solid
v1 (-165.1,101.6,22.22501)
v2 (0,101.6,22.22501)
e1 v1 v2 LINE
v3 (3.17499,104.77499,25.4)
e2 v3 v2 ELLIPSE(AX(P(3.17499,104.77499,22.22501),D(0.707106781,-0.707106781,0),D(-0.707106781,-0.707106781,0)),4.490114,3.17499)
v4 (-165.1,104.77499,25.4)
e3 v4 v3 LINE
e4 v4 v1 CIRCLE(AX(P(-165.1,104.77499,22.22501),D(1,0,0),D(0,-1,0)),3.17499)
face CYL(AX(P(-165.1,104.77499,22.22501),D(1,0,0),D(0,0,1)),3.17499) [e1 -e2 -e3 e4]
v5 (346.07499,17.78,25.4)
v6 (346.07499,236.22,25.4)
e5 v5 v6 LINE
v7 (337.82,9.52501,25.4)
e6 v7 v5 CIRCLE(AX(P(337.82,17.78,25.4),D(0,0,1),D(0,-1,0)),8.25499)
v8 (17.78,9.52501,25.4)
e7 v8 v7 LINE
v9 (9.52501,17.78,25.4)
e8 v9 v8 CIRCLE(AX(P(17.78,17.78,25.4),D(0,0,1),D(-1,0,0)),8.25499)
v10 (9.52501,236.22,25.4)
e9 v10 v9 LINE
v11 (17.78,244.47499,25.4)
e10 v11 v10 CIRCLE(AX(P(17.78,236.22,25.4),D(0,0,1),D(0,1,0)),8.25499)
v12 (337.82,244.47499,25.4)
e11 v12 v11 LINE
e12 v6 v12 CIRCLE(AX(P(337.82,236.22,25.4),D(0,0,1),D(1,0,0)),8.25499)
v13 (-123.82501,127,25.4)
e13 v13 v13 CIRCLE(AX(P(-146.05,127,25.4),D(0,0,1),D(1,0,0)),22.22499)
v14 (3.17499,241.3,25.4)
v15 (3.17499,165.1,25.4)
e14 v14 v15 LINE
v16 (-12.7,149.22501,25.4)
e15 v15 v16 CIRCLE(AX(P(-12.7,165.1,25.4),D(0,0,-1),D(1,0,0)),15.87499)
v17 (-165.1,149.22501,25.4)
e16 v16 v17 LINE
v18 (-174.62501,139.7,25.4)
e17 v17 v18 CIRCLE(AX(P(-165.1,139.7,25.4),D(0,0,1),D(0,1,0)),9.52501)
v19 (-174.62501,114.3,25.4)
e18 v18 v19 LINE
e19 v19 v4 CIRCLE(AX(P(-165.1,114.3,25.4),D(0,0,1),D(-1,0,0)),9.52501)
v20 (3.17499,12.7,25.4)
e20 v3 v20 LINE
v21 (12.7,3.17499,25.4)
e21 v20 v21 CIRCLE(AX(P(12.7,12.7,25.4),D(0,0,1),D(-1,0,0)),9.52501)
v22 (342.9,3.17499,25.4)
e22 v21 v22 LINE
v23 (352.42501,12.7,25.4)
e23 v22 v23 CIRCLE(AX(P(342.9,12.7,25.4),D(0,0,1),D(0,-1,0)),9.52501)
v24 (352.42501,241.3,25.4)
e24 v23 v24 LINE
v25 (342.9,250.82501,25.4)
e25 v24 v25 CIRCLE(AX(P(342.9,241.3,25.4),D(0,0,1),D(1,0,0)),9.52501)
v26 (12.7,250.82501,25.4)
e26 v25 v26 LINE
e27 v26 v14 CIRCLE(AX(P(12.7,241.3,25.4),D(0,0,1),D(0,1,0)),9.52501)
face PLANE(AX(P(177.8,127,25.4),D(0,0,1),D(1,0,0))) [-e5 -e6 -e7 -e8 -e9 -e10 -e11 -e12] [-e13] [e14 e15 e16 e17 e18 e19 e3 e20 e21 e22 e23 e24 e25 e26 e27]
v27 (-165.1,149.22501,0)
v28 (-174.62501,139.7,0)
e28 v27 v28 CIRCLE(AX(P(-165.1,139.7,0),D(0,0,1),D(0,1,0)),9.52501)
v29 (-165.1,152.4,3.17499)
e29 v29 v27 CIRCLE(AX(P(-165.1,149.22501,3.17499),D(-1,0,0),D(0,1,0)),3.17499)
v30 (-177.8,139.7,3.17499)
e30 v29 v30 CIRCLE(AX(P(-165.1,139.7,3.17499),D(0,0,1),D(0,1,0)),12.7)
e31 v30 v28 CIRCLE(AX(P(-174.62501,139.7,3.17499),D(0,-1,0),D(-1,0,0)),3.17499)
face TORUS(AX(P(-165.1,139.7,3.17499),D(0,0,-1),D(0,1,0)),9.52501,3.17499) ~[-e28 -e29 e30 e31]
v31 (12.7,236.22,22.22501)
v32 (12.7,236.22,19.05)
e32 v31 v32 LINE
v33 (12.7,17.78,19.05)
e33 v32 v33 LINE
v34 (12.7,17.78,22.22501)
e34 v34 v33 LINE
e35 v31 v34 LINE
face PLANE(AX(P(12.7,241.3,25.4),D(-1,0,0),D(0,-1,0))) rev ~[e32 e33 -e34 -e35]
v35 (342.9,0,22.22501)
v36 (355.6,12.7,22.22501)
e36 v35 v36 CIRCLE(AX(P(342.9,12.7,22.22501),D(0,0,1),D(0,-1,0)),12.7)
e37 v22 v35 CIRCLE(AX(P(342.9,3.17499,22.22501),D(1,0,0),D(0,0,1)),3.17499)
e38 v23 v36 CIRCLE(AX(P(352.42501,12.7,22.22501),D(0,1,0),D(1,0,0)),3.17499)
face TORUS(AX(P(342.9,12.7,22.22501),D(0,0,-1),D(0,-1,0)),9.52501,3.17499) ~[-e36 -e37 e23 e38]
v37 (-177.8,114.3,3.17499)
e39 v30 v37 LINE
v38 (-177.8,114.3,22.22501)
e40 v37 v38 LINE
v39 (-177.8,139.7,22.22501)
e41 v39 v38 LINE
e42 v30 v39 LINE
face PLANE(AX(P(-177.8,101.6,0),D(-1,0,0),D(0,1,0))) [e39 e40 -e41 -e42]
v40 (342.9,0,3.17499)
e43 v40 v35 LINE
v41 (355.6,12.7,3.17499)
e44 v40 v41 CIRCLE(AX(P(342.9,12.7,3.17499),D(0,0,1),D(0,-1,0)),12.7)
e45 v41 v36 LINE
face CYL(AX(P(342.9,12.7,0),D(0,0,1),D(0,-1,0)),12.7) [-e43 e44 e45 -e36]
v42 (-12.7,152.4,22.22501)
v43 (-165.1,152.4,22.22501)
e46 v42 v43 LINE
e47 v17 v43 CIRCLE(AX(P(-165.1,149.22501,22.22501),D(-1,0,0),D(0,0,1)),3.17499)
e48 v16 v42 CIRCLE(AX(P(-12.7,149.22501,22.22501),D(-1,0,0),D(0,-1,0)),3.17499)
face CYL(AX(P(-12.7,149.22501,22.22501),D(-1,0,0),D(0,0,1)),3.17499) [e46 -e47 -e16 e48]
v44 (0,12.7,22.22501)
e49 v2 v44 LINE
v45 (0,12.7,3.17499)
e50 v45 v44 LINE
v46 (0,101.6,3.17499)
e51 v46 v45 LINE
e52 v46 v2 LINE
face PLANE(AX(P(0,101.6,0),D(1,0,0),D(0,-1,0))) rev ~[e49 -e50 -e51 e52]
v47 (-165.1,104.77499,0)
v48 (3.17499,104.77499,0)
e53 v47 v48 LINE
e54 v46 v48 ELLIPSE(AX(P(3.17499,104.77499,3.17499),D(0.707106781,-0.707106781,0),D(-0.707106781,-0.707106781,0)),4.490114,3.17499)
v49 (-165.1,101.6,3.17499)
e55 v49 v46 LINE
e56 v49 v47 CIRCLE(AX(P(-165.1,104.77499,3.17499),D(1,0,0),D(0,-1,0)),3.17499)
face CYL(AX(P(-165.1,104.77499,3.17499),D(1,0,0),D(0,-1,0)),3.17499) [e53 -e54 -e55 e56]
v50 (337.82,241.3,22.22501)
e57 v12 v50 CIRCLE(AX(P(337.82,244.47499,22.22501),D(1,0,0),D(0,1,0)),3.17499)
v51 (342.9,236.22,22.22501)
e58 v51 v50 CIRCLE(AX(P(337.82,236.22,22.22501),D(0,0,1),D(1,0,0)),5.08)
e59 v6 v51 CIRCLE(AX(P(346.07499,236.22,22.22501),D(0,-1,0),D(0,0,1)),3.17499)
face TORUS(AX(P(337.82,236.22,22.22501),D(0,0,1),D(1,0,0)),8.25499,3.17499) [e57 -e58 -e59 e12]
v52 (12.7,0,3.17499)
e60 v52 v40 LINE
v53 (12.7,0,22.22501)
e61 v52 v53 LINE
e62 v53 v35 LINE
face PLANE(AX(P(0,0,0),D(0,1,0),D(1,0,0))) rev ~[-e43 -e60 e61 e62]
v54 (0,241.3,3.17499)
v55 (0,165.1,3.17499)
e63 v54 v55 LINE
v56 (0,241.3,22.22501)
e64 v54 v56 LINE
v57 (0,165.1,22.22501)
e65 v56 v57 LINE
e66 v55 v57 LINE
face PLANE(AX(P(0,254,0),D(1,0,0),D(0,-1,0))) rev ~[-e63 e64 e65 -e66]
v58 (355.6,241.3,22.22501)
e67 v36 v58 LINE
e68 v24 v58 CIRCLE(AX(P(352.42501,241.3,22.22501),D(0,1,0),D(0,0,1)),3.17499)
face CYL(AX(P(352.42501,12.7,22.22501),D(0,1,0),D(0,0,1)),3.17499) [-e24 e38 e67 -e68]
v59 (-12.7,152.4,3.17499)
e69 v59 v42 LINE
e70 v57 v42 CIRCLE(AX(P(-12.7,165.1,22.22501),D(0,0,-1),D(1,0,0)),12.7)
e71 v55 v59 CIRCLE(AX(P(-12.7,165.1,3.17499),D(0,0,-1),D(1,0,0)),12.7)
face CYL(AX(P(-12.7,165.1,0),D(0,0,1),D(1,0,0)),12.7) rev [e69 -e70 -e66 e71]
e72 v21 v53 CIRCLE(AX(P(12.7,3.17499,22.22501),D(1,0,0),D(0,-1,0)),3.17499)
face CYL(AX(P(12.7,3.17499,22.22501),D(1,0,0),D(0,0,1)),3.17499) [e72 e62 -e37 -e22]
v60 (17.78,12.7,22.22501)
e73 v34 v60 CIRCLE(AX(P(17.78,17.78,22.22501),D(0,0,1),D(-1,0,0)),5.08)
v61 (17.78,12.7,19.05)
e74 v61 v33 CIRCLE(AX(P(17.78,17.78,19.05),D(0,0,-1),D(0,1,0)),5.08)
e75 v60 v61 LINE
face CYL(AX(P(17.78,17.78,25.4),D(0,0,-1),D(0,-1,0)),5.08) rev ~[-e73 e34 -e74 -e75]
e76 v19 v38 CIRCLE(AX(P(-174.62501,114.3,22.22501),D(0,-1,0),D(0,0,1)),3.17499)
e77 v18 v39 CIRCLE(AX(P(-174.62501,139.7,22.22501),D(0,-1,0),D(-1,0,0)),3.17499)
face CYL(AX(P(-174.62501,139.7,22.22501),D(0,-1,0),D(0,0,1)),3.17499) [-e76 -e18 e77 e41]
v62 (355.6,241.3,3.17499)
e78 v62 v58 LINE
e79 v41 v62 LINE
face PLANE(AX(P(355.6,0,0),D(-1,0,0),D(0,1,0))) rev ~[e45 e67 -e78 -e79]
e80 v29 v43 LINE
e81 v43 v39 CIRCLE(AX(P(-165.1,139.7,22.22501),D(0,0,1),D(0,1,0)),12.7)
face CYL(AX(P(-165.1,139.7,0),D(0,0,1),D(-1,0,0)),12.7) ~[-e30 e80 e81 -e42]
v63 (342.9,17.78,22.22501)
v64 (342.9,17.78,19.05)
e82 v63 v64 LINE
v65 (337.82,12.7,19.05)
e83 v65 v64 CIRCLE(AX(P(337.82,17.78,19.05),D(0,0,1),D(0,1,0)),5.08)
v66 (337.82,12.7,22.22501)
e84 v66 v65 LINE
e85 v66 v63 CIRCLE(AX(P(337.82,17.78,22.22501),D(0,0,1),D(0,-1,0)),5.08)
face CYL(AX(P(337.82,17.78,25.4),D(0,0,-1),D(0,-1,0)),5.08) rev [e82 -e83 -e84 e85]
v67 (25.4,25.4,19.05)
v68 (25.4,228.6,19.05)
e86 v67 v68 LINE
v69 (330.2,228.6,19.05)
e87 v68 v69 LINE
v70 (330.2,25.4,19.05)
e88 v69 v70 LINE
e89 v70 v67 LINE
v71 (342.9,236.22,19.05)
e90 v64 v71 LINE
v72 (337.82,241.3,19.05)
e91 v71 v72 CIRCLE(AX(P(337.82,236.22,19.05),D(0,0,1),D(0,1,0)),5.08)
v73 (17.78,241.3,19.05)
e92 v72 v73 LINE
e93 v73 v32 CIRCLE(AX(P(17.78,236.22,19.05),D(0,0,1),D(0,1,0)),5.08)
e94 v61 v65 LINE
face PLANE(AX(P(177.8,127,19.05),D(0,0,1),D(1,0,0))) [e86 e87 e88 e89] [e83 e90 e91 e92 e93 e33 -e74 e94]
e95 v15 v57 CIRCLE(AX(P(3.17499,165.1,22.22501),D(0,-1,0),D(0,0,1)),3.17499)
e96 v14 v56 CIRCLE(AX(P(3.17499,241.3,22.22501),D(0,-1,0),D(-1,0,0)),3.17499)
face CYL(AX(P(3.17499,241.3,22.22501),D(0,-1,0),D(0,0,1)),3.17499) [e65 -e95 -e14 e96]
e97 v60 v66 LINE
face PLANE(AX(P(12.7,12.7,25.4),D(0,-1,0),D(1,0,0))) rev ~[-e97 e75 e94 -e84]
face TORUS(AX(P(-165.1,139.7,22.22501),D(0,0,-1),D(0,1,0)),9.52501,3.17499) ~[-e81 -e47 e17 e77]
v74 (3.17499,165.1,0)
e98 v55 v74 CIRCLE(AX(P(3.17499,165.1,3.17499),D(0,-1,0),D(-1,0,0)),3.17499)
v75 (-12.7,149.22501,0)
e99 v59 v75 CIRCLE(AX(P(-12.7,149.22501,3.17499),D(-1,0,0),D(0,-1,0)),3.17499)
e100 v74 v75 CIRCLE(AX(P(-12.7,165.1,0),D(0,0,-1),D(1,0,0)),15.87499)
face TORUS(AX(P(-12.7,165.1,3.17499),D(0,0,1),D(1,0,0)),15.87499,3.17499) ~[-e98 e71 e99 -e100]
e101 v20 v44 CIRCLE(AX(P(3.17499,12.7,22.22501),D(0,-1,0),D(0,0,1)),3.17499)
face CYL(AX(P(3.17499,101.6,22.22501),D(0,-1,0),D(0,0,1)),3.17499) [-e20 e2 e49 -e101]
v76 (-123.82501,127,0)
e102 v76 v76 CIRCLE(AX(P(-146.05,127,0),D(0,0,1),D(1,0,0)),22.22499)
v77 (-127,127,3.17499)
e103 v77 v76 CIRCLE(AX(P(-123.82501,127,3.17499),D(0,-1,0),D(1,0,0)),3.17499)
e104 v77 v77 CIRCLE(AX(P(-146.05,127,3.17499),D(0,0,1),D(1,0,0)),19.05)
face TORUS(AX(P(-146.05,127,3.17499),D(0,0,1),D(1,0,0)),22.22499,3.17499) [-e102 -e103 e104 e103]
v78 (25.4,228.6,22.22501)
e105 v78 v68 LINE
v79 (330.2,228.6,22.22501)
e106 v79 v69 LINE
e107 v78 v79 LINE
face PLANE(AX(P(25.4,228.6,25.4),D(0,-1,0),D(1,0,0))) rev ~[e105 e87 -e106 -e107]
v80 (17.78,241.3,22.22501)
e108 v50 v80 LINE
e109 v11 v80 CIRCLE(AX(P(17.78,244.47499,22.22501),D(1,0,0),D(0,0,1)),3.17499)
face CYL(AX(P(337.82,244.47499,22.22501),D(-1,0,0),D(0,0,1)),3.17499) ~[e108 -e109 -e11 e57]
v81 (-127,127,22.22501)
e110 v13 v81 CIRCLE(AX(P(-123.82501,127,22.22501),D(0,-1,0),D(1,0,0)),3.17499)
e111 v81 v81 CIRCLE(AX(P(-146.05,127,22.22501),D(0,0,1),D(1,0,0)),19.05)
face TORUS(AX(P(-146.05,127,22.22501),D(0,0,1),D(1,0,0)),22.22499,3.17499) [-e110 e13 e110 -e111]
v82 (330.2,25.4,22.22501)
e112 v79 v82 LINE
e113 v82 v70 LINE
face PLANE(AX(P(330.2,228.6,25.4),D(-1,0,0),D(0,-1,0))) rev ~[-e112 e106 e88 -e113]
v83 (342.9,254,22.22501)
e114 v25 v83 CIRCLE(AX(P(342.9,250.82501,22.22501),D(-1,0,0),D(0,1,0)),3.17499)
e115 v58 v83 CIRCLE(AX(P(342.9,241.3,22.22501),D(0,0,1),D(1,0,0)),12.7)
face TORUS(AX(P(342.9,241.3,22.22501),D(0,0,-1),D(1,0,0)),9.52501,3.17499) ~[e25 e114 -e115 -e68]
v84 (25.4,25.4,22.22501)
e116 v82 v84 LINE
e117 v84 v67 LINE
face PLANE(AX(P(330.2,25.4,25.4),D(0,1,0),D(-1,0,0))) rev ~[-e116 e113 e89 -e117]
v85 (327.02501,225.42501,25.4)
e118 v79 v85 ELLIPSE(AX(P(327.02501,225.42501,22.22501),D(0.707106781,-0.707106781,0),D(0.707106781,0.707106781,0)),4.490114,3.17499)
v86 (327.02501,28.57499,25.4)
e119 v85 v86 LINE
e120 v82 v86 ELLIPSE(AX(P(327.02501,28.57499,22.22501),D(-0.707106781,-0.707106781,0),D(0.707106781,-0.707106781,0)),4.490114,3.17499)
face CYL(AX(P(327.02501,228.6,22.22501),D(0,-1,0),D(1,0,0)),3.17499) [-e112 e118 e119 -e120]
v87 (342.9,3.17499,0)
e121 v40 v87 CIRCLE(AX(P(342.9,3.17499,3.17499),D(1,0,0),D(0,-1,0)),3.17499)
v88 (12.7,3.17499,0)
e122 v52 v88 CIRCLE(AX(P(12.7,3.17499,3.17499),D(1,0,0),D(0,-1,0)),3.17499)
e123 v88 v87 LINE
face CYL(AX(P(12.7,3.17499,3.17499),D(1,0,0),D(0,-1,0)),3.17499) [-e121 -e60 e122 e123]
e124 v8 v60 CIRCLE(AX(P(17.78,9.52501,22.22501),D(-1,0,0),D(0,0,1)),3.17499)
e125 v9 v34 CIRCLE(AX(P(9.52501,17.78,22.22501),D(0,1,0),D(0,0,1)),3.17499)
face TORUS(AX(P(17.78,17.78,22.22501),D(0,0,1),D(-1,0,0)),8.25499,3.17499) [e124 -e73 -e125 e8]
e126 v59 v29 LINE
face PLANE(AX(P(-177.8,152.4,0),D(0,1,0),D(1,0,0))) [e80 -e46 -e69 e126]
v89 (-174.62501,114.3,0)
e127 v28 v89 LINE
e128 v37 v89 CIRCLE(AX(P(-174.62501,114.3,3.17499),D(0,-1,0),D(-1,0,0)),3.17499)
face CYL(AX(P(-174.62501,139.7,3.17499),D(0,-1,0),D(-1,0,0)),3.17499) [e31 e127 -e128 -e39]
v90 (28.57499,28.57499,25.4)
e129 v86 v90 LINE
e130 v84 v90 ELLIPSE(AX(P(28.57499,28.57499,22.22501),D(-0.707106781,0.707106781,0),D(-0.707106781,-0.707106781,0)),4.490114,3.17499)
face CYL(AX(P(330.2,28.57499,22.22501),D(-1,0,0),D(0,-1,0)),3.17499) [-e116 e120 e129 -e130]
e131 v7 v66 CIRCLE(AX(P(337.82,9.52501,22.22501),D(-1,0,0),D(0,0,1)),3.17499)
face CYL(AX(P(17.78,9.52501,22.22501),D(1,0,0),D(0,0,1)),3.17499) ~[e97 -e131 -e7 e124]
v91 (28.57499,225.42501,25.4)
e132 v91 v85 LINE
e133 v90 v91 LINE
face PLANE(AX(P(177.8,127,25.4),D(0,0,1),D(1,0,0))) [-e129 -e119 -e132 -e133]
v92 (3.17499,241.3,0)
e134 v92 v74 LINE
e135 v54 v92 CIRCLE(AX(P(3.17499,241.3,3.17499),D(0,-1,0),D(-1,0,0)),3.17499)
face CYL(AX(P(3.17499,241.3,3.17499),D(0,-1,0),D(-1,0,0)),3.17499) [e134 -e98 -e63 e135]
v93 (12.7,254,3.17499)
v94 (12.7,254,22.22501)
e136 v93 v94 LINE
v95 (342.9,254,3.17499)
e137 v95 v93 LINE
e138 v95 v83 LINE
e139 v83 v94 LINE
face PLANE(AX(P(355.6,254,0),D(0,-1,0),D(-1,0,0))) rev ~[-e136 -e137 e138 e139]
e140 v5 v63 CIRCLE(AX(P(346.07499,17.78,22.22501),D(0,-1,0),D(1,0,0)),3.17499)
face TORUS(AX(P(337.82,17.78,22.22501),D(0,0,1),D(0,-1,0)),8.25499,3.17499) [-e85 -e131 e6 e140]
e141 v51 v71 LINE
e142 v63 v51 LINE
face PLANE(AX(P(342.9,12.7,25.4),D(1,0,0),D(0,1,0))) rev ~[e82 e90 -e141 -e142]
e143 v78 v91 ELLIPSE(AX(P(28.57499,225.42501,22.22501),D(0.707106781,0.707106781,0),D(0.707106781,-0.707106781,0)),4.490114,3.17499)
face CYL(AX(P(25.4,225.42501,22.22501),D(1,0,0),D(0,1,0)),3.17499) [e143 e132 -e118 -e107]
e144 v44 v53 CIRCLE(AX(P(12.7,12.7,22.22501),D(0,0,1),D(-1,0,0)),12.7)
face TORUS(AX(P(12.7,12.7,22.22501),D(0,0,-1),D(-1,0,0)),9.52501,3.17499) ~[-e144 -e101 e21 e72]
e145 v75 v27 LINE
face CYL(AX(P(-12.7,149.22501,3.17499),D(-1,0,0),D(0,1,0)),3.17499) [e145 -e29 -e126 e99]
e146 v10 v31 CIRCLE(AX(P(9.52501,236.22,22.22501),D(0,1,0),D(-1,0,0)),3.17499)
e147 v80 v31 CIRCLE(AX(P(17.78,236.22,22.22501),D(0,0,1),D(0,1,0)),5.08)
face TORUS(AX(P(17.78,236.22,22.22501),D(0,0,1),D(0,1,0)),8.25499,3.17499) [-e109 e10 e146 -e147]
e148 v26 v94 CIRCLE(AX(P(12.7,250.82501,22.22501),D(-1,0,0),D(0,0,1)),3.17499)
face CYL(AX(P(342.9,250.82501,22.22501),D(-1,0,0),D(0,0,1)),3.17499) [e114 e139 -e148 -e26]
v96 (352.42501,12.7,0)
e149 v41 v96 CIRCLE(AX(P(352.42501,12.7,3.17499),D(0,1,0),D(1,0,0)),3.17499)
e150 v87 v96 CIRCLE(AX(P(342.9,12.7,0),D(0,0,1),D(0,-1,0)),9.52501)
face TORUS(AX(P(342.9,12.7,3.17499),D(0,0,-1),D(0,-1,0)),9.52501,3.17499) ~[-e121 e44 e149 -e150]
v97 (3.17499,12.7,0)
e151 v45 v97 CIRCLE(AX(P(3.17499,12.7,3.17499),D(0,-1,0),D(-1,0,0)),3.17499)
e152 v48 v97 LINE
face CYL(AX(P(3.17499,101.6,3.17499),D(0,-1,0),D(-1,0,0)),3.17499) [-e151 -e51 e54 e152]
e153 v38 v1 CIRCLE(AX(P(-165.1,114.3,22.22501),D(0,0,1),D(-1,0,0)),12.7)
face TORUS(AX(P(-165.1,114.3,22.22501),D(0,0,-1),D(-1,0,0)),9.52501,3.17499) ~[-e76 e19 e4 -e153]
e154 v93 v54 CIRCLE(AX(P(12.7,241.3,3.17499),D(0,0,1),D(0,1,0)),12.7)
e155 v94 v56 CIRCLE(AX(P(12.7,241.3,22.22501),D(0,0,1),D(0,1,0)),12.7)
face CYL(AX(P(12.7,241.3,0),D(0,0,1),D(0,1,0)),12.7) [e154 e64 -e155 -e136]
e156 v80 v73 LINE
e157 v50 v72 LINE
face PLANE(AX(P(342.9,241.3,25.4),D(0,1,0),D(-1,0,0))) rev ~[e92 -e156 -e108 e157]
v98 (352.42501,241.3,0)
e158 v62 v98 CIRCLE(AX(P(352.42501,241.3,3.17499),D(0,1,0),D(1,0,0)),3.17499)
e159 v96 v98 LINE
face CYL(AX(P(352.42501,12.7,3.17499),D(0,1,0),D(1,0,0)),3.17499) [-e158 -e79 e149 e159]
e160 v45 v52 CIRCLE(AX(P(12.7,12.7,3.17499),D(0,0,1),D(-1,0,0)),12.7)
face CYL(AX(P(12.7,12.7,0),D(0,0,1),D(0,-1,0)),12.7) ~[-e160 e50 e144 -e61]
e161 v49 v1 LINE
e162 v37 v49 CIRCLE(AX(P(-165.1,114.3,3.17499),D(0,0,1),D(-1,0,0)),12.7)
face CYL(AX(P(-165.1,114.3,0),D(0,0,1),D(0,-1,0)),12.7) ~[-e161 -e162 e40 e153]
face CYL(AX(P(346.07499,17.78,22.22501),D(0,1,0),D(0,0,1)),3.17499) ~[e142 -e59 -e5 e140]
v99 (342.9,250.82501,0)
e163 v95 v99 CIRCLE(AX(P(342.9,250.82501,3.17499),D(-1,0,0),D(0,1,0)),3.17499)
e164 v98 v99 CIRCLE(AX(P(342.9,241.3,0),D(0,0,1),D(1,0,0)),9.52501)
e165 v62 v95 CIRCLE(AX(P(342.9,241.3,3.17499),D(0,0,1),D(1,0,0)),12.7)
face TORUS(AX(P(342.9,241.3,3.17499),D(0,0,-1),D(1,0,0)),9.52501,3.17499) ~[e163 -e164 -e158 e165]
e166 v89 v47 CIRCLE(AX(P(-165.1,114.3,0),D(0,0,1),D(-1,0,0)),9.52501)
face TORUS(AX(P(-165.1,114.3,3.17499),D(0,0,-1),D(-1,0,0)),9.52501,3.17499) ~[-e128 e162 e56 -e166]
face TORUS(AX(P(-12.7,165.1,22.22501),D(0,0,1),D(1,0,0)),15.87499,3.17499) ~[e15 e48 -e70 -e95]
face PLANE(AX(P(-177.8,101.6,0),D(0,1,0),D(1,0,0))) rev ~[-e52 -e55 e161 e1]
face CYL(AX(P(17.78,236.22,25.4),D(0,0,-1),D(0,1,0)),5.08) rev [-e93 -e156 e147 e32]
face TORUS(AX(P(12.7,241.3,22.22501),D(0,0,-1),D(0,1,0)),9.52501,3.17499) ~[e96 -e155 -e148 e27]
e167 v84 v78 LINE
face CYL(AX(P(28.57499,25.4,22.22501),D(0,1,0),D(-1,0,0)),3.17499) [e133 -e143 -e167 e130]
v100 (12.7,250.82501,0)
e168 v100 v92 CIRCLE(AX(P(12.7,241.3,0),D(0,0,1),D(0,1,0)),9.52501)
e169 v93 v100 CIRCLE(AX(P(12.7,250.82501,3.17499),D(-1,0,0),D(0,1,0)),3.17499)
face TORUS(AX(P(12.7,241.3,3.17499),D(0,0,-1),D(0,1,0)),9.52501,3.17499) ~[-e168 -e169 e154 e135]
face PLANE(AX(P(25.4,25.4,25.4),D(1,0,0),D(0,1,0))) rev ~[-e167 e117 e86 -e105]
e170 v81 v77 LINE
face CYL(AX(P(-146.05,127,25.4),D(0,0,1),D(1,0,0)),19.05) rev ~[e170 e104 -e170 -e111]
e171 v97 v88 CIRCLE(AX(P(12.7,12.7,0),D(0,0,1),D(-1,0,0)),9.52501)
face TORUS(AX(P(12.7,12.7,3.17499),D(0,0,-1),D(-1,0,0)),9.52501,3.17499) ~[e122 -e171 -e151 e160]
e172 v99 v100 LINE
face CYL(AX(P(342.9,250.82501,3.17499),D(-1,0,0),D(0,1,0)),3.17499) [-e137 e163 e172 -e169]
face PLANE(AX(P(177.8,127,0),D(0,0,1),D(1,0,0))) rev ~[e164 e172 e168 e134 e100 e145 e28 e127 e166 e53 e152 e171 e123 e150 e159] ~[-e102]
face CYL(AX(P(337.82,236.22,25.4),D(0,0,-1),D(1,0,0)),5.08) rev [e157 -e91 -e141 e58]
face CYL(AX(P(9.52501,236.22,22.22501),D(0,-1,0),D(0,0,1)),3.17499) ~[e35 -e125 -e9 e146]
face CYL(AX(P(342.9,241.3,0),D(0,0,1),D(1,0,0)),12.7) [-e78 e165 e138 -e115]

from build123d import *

# Parameters (mm, degrees)
F0_W     = 177.8
F0_H     = 50.8
F1_DEPTH = 25.4
F2_R     = 19.05
F3_DEPTH = 25.4
F5_DEPTH = 6.35
F6_R     = 5.08
F7_R     = 12.7
F8_R     = 3.17499


# Not quite as in the source:
# - a fillet or chamfer is up to 0.001 mm smaller than in the source, because OpenCascade refuses the exact size


with BuildPart() as f1:
    # F0 (on Top) → F1 (new body)
    with BuildSketch(Plane.XY):
        Polygon((0, 101.6), (0, 0), (355.6, 0), (355.6, 254), (0, 254), (0, 152.4), align=None)
        with Locations((-88.9, 127)):
            Rectangle(F0_W, F0_H)
    extrude(amount=F1_DEPTH)

    # F2 (on face) → F3 (cut)
    with BuildSketch(Plane.XY.offset(25.4)):
        with Locations((-146.05, 127)):
            Circle(F2_R)
    extrude(amount=-F3_DEPTH, mode=Mode.SUBTRACT)

    # F4 (on face) → F5 (cut)
    with BuildSketch(Plane.XY.offset(25.4)):
        Polygon((12.7, 101.6), (12.7, 12.7), (342.9, 12.7), (342.9, 241.3), (12.7, 241.3), (12.7, 152.4), align=None)
        Polygon((25.4, 101.6), (25.4, 152.4), (25.4, 228.6), (330.2, 228.6), (330.2, 25.4), (25.4, 25.4), align=None, mode=Mode.SUBTRACT)
    extrude(amount=-F5_DEPTH, mode=Mode.SUBTRACT)

    # F6
    f6_edges = [f1.edges().sort_by_distance(p)[0] for p in [
        (12.7, 241.3, 22.225),
        (342.9, 241.3, 22.225),
        (12.7, 12.7, 22.225),
        (342.9, 12.7, 22.225),
    ]]
    fillet(f6_edges, radius=F6_R)

    # F7
    f7_edges = [f1.edges().sort_by_distance(p)[0] for p in [
        (355.6, 0, 12.7),
        (0, 0, 12.7),
        (-177.8, 101.6, 12.7),
        (-177.8, 152.4, 12.7),
        (0, 152.4, 12.7),
        (0, 254, 12.7),
        (355.6, 254, 12.7),
    ]]
    fillet(f7_edges, radius=F7_R)

    # F8 (radius 3.175 in the source; OpenCascade refuses exactly that, so slightly less here)
    f8_edges = [f1.edges().sort_by_distance(p)[0] for p in [
        (177.8, 228.6, 25.4),
        (330.2, 127, 25.4),
        (177.8, 25.4, 25.4),
        (25.4, 127, 25.4),
        (0, 57.15, 25.4),
        (3.719744, 3.719744, 25.4),
        (-82.55, 101.6, 25.4),
        (177.8, 0, 25.4),
        (-174.080256, 105.319744, 25.4),
        (351.880256, 3.719744, 25.4),
        (-177.8, 127, 25.4),
        (355.6, 127, 25.4),
        (-174.080256, 148.680256, 25.4),
        (351.880256, 250.280256, 25.4),
        (-88.9, 152.4, 25.4),
        (177.8, 254, 25.4),
        (-3.719744, 156.119744, 25.4),
        (3.719744, 250.280256, 25.4),
        (0, 203.2, 25.4),
        (177.8, 12.7, 25.4),
        (14.187898, 14.187898, 25.4),
        (341.412102, 14.187898, 25.4),
        (12.7, 127, 25.4),
        (342.9, 127, 25.4),
        (14.187898, 239.812102, 25.4),
        (341.412102, 239.812102, 25.4),
        (177.8, 241.3, 25.4),
        (-165.1, 127, 25.4),
        (0, 57.15, 0),
        (3.719744, 3.719744, 0),
        (-82.55, 101.6, 0),
        (177.8, 0, 0),
        (-174.080256, 105.319744, 0),
        (351.880256, 3.719744, 0),
        (-177.8, 127, 0),
        (355.6, 127, 0),
        (-174.080256, 148.680256, 0),
        (351.880256, 250.280256, 0),
        (-88.9, 152.4, 0),
        (177.8, 254, 0),
        (-3.719744, 156.119744, 0),
        (3.719744, 250.280256, 0),
        (0, 203.2, 0),
        (-165.1, 127, 0),
    ]]
    fillet(f8_edges, radius=F8_R)


solid = f1.part
